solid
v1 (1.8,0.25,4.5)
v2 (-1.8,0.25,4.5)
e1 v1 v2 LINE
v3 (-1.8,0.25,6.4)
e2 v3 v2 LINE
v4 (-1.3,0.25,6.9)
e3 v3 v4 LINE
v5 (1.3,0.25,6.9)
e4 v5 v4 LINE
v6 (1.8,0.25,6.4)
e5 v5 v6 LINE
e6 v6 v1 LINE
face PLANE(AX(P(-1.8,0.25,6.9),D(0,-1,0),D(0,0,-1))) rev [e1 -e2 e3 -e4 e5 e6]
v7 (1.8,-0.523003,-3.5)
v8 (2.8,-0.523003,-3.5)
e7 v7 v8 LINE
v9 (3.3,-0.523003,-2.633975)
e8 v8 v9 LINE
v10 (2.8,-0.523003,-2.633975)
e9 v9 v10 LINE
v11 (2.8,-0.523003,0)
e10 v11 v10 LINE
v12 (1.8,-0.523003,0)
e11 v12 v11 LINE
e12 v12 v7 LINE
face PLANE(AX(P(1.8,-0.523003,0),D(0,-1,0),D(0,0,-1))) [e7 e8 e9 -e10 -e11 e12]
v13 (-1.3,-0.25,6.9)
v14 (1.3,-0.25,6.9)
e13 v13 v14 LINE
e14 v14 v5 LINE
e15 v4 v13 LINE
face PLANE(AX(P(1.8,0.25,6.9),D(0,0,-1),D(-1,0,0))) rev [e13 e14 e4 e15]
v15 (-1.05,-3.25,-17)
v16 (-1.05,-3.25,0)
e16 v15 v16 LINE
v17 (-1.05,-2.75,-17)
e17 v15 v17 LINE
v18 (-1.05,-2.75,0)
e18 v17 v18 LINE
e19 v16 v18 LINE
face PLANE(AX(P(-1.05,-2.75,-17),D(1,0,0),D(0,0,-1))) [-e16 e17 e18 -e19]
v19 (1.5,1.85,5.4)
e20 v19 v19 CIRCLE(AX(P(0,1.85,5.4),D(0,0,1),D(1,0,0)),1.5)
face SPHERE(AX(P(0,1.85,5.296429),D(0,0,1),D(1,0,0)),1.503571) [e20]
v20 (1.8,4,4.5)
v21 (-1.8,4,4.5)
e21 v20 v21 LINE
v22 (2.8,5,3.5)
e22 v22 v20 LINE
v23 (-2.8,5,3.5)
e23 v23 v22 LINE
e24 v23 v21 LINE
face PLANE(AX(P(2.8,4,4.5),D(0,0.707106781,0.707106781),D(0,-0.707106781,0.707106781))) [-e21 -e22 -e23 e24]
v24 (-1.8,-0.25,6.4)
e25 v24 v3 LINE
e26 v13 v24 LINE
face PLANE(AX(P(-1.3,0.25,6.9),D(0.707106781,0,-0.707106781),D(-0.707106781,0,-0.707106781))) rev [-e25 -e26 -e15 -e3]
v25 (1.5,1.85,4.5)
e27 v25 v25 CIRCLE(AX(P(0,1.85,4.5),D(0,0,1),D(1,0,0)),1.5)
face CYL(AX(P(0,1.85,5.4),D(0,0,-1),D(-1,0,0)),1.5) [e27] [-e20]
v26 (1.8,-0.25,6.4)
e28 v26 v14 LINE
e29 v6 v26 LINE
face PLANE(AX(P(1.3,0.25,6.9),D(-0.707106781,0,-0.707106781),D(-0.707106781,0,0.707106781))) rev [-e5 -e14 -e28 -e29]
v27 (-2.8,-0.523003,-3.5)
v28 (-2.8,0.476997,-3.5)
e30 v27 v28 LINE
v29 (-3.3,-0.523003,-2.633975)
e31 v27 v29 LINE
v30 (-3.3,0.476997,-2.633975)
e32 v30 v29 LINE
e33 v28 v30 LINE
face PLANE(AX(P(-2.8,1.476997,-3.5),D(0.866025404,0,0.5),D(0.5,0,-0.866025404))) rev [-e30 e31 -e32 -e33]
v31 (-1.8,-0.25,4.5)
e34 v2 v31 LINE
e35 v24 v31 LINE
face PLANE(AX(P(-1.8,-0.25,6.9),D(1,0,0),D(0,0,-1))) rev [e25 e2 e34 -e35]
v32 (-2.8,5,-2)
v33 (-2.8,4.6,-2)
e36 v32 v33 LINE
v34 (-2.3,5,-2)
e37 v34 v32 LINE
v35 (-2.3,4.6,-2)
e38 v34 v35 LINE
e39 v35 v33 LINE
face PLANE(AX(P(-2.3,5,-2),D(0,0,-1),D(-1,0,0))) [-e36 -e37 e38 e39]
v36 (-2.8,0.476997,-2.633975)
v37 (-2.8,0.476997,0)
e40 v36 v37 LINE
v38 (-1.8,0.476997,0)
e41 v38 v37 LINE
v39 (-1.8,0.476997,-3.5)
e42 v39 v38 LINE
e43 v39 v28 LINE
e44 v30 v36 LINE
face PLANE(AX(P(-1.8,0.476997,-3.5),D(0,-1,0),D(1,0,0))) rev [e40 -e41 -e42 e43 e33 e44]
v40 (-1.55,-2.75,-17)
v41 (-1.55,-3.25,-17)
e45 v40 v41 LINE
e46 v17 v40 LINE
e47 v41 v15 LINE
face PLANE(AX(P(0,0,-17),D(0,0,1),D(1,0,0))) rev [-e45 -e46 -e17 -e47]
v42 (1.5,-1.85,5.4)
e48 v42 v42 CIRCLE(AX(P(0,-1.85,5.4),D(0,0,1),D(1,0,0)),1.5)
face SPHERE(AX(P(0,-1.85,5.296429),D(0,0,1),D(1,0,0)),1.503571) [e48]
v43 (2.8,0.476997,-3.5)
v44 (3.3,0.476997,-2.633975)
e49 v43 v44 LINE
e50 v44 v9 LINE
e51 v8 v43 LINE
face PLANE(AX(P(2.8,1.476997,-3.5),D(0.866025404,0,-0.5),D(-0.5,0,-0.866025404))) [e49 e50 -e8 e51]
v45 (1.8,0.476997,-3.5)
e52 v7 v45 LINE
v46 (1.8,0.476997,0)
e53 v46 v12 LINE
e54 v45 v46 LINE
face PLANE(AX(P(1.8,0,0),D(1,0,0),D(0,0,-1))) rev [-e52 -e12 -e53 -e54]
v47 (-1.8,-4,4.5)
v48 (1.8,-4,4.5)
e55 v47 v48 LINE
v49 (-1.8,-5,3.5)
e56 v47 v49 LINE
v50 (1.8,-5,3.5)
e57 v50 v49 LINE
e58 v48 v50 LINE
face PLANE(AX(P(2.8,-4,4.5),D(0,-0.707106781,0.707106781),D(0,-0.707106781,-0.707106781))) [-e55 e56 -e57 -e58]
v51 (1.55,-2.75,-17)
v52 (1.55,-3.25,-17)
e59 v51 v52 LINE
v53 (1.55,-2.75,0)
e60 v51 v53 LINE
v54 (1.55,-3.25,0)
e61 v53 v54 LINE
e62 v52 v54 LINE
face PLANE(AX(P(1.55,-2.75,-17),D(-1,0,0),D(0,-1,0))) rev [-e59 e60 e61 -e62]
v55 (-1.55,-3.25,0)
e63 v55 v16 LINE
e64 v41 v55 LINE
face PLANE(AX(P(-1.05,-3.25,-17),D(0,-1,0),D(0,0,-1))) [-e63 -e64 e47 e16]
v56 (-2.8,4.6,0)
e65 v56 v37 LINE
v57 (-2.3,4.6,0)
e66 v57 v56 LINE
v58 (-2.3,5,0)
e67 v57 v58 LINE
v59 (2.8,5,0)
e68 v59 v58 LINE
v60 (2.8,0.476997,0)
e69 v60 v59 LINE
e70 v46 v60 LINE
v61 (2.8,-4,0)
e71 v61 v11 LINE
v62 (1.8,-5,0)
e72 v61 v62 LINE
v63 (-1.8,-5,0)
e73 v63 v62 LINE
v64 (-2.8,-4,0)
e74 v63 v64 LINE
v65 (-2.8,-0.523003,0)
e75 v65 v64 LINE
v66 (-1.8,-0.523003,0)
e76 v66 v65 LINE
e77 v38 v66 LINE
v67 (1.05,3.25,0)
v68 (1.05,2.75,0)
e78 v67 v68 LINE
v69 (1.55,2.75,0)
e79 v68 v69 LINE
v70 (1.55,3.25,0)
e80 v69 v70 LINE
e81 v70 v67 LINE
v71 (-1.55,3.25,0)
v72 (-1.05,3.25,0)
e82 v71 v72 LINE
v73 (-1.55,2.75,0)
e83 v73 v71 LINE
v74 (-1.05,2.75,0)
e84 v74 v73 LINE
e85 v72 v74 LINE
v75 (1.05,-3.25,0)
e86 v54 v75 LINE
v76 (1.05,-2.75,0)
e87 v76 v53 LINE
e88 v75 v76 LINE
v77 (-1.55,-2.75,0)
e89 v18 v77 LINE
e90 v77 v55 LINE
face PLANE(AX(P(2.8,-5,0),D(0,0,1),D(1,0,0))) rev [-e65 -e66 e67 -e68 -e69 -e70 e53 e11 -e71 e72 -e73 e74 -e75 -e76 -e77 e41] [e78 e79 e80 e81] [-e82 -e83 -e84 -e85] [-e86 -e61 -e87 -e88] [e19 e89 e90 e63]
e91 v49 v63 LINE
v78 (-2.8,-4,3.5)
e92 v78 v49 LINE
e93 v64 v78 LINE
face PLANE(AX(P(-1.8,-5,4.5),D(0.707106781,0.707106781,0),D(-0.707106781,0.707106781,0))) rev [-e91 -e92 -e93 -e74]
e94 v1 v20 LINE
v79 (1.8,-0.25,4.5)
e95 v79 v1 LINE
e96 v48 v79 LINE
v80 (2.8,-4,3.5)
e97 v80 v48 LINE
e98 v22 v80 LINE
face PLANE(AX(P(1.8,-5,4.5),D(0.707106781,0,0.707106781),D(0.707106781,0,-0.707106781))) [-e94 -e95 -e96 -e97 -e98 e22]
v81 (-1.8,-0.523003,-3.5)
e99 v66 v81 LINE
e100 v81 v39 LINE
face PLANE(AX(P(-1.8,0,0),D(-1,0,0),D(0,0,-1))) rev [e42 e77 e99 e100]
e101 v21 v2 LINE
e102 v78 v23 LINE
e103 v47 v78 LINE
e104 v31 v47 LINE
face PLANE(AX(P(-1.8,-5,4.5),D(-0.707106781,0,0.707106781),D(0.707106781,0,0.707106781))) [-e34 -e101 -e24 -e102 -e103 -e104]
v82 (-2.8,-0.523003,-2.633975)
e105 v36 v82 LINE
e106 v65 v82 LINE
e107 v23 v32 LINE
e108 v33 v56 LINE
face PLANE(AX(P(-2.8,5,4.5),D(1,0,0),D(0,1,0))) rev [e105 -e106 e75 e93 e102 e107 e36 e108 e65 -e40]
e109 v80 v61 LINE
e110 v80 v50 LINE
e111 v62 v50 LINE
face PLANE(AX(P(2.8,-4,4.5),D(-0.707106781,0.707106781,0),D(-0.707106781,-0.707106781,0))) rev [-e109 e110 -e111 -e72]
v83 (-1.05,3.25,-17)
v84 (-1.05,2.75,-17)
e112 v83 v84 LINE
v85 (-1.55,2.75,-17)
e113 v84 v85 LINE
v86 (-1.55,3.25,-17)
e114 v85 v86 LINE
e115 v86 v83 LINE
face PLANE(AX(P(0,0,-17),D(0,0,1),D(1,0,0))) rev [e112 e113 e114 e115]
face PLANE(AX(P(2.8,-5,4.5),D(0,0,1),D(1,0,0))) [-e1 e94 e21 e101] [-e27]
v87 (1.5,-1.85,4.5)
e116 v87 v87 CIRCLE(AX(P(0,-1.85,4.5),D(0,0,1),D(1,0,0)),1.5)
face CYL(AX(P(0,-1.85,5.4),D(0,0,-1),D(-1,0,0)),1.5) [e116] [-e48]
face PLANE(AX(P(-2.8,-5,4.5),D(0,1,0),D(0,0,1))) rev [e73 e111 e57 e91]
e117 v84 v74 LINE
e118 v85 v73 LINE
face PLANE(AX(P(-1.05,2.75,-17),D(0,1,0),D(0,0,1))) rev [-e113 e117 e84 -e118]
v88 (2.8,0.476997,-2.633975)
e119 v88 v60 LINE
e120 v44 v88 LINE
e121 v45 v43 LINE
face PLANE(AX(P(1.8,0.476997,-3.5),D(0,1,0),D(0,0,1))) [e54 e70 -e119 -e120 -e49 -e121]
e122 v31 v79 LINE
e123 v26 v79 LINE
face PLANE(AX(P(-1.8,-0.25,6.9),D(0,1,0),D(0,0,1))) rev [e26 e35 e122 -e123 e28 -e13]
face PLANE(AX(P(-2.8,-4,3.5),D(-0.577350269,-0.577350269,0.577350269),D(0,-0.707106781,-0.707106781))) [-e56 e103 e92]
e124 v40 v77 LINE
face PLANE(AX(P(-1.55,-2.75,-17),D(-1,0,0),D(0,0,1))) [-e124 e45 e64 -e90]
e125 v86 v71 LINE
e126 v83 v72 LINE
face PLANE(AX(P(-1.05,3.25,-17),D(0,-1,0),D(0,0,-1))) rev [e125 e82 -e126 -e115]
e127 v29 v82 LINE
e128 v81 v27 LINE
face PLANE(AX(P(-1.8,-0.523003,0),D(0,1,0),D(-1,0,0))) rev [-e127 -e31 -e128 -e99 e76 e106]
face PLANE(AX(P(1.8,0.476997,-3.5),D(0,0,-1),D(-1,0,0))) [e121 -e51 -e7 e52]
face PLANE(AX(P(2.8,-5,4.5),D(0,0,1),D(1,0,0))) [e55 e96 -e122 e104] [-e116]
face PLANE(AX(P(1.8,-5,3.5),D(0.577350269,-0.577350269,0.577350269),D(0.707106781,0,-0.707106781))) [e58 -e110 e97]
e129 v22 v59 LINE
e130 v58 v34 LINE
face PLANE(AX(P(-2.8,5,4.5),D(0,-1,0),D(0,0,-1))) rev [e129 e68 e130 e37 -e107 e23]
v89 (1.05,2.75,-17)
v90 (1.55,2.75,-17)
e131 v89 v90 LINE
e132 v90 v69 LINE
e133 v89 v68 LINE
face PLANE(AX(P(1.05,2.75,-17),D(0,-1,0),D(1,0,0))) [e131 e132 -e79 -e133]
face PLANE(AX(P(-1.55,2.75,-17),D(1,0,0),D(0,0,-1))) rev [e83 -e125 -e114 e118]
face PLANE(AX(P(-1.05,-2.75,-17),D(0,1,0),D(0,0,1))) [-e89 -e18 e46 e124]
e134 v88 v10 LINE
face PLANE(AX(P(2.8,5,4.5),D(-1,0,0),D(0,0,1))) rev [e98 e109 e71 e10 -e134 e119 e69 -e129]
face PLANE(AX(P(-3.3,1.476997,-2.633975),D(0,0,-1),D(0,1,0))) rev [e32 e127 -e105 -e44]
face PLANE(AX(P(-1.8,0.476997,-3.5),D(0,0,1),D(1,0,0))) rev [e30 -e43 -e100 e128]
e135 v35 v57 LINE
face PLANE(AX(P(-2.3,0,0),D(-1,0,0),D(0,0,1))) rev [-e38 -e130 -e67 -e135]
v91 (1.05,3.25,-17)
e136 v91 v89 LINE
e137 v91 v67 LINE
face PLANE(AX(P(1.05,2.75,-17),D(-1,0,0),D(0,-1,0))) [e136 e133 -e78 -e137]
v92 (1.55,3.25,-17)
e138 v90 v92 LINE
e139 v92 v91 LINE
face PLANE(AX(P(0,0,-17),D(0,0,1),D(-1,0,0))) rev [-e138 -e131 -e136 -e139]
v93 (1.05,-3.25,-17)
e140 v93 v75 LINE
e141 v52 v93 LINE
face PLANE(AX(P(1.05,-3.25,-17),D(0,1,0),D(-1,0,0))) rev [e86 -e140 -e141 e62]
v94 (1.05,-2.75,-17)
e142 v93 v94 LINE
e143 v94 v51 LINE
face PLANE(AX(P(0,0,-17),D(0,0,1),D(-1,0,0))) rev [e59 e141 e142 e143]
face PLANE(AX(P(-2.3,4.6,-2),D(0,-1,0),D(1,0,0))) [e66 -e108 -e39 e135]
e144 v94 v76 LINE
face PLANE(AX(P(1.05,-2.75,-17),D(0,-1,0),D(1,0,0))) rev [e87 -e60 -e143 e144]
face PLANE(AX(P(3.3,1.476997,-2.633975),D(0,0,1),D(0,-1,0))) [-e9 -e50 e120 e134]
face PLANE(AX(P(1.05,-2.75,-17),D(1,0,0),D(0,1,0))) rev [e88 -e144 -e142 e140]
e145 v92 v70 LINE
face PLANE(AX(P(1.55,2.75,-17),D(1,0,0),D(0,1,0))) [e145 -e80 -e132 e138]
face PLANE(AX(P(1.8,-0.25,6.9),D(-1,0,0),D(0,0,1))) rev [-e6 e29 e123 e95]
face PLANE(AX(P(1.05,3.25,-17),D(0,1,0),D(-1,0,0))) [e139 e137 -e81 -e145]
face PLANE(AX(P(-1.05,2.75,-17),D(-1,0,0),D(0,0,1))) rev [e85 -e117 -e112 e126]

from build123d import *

# Parameters (mm, degrees)
SKETCH1_W               = 5.6
SKETCH1_H               = 10
BOSS_EXTRUDE1_DEPTH     = 4.5
CHAMFER1_SIZE           = 1
SKETCH2_R               = 1.5
BOSS_EXTRUDE2_DEPTH     = 0.9
SKETCH3_W               = 3.6
SKETCH3_H               = 0.5
BOSS_EXTRUDE3_DEPTH     = 2.4
CHAMFER2_SIZE           = 0.5
SKETCH4_W               = 3.5
SKETCH4_H               = 1
BOSS_EXTRUDE4_DEPTH     = 1
BOSS_EXTRUDE5_DEPTH     = 1
SKETCH6_W               = 2
SKETCH6_H               = 0.4
BOSS_EXTRUDE6_DEPTH     = 0.5
SKETCH7_W               = 0.5
SKETCH7_H               = 0.5
BOSS_EXTRUDE7_DEPTH     = 17
MIRROR3_COPY_1_SKETCH_W = 0.5
MIRROR3_COPY_1_SKETCH_H = 0.5
MIRROR3_COPY_1_DEPTH    = 17


# Read off the part's stored shape, not the designer's step: Dome1, Dome2
with BuildPart() as part:
    # Sketch1 → Boss-Extrude1 (new body)
    with BuildSketch(Plane.XY):
        Rectangle(SKETCH1_W, SKETCH1_H)
    extrude(amount=BOSS_EXTRUDE1_DEPTH)

    # Chamfer1
    chamfer1_edges = [part.edges().sort_by_distance(p)[0] for p in [
        (-2.8, 0, 4.5),
        (0, -5, 4.5),
        (2.8, 0, 4.5),
        (0, 5, 4.5),
        (2.8, -5, 2.25),
        (-2.8, -5, 2.25),
    ]]
    chamfer(chamfer1_edges, length=CHAMFER1_SIZE)

    # Sketch2 → Boss-Extrude2 (add)
    with BuildSketch(Plane.XY.offset(4.5)):
        with Locations((0, 1.85)):
            Circle(SKETCH2_R)
        with Locations((0, -1.85)):
            Circle(SKETCH2_R)
    extrude(amount=BOSS_EXTRUDE2_DEPTH)

    # Dome1 outline → Dome1 (revolve)
    with BuildSketch(Plane.XZ.offset(-1.85)):
        with BuildLine():
            Line((0, 5.4), (1.5, 5.399999999))
            ThreePointArc((1.5, 5.399999999), (1.025914227, 6.395622385), (0, 6.8))
            Line((0, 6.8), (0, 5.4))
        make_face()
    revolve(axis=Axis((0, 1.85, 0), (0, 0, 1)))

    # Dome2 outline → Dome2 (revolve)
    with BuildSketch(Plane.XZ.offset(1.85)):
        with BuildLine():
            Line((0, 5.4), (1.5, 5.399999999))
            ThreePointArc((1.5, 5.399999999), (1.025914227, 6.395622385), (0, 6.8))
            Line((0, 6.8), (0, 5.4))
        make_face()
    revolve(axis=Axis((0, -1.85, 0), (0, 0, 1)))

    # Sketch3 → Boss-Extrude3 (add)
    with BuildSketch(Plane.XY.offset(4.5)):
        Rectangle(SKETCH3_W, SKETCH3_H)
    extrude(amount=BOSS_EXTRUDE3_DEPTH)

    # Chamfer2
    chamfer2_edges = [part.edges().sort_by_distance(p)[0] for p in [
        (1.8, 0, 6.9),
        (-1.8, 0, 6.9),
    ]]
    chamfer(chamfer2_edges, length=CHAMFER2_SIZE)

    # Sketch4 → Boss-Extrude4 (add)
    with BuildSketch(Plane(origin=(2.8, 0, 0), x_dir=(0, 0, -1), z_dir=(1, 0, 0))):
        with Locations((1.75, -0.023003027)):
            Rectangle(SKETCH4_W, SKETCH4_H)
    boss_extrude4 = extrude(amount=-BOSS_EXTRUDE4_DEPTH)

    # Sketch5 → Boss-Extrude5 (add)
    with BuildSketch(Plane.XZ.offset(0.523003027)):
        Polygon((2.8, -2.633974596), (2.8, -3.5), (3.3, -2.633974596), align=None)
    boss_extrude5 = extrude(amount=-BOSS_EXTRUDE5_DEPTH)

    # Mirror1: Boss-Extrude4, Boss-Extrude5 across plane
    add(boss_extrude4.mirror(Plane(origin=(0, 0, 0), x_dir=(0, 0, 1), z_dir=(1, 0, 0))))
    add(boss_extrude5.mirror(Plane(origin=(0, 0, 0), x_dir=(0, 0, 1), z_dir=(1, 0, 0))))

    # Sketch6 → Boss-Extrude6 (add)
    with BuildSketch(Plane.ZY.offset(2.8)):
        with Locations((-1, 4.8)):
            Rectangle(SKETCH6_W, SKETCH6_H)
    extrude(amount=-BOSS_EXTRUDE6_DEPTH)

    # Sketch7 → Boss-Extrude7 (add)
    with BuildSketch(Plane(origin=(0, 0, 0), x_dir=(-1, 0, 0), z_dir=(0, 0, -1))):
        with Locations((1.3, 3)):
            Rectangle(SKETCH7_W, SKETCH7_H)
    boss_extrude7 = extrude(amount=BOSS_EXTRUDE7_DEPTH)

    # Mirror2: Boss-Extrude7 across plane
    add(boss_extrude7.mirror(Plane(origin=(0, 0, 0), x_dir=(0, 0, 1), z_dir=(1, 0, 0))))

    # Mirror3: Boss-Extrude7 across plane
    add(boss_extrude7.mirror(Plane(origin=(0, 0, 0), x_dir=(0, 0, 1), z_dir=(0, -1, 0))))

    # Mirror3 copy 1 sketch → Mirror3 copy 1 (add)
    with BuildSketch(Plane(origin=(0, 0, 0), x_dir=(1, 0, 0), z_dir=(0, 0, -1))):
        with Locations((1.3, 3)):
            Rectangle(MIRROR3_COPY_1_SKETCH_W, MIRROR3_COPY_1_SKETCH_H)
    extrude(amount=MIRROR3_COPY_1_DEPTH)


solid = part.part
